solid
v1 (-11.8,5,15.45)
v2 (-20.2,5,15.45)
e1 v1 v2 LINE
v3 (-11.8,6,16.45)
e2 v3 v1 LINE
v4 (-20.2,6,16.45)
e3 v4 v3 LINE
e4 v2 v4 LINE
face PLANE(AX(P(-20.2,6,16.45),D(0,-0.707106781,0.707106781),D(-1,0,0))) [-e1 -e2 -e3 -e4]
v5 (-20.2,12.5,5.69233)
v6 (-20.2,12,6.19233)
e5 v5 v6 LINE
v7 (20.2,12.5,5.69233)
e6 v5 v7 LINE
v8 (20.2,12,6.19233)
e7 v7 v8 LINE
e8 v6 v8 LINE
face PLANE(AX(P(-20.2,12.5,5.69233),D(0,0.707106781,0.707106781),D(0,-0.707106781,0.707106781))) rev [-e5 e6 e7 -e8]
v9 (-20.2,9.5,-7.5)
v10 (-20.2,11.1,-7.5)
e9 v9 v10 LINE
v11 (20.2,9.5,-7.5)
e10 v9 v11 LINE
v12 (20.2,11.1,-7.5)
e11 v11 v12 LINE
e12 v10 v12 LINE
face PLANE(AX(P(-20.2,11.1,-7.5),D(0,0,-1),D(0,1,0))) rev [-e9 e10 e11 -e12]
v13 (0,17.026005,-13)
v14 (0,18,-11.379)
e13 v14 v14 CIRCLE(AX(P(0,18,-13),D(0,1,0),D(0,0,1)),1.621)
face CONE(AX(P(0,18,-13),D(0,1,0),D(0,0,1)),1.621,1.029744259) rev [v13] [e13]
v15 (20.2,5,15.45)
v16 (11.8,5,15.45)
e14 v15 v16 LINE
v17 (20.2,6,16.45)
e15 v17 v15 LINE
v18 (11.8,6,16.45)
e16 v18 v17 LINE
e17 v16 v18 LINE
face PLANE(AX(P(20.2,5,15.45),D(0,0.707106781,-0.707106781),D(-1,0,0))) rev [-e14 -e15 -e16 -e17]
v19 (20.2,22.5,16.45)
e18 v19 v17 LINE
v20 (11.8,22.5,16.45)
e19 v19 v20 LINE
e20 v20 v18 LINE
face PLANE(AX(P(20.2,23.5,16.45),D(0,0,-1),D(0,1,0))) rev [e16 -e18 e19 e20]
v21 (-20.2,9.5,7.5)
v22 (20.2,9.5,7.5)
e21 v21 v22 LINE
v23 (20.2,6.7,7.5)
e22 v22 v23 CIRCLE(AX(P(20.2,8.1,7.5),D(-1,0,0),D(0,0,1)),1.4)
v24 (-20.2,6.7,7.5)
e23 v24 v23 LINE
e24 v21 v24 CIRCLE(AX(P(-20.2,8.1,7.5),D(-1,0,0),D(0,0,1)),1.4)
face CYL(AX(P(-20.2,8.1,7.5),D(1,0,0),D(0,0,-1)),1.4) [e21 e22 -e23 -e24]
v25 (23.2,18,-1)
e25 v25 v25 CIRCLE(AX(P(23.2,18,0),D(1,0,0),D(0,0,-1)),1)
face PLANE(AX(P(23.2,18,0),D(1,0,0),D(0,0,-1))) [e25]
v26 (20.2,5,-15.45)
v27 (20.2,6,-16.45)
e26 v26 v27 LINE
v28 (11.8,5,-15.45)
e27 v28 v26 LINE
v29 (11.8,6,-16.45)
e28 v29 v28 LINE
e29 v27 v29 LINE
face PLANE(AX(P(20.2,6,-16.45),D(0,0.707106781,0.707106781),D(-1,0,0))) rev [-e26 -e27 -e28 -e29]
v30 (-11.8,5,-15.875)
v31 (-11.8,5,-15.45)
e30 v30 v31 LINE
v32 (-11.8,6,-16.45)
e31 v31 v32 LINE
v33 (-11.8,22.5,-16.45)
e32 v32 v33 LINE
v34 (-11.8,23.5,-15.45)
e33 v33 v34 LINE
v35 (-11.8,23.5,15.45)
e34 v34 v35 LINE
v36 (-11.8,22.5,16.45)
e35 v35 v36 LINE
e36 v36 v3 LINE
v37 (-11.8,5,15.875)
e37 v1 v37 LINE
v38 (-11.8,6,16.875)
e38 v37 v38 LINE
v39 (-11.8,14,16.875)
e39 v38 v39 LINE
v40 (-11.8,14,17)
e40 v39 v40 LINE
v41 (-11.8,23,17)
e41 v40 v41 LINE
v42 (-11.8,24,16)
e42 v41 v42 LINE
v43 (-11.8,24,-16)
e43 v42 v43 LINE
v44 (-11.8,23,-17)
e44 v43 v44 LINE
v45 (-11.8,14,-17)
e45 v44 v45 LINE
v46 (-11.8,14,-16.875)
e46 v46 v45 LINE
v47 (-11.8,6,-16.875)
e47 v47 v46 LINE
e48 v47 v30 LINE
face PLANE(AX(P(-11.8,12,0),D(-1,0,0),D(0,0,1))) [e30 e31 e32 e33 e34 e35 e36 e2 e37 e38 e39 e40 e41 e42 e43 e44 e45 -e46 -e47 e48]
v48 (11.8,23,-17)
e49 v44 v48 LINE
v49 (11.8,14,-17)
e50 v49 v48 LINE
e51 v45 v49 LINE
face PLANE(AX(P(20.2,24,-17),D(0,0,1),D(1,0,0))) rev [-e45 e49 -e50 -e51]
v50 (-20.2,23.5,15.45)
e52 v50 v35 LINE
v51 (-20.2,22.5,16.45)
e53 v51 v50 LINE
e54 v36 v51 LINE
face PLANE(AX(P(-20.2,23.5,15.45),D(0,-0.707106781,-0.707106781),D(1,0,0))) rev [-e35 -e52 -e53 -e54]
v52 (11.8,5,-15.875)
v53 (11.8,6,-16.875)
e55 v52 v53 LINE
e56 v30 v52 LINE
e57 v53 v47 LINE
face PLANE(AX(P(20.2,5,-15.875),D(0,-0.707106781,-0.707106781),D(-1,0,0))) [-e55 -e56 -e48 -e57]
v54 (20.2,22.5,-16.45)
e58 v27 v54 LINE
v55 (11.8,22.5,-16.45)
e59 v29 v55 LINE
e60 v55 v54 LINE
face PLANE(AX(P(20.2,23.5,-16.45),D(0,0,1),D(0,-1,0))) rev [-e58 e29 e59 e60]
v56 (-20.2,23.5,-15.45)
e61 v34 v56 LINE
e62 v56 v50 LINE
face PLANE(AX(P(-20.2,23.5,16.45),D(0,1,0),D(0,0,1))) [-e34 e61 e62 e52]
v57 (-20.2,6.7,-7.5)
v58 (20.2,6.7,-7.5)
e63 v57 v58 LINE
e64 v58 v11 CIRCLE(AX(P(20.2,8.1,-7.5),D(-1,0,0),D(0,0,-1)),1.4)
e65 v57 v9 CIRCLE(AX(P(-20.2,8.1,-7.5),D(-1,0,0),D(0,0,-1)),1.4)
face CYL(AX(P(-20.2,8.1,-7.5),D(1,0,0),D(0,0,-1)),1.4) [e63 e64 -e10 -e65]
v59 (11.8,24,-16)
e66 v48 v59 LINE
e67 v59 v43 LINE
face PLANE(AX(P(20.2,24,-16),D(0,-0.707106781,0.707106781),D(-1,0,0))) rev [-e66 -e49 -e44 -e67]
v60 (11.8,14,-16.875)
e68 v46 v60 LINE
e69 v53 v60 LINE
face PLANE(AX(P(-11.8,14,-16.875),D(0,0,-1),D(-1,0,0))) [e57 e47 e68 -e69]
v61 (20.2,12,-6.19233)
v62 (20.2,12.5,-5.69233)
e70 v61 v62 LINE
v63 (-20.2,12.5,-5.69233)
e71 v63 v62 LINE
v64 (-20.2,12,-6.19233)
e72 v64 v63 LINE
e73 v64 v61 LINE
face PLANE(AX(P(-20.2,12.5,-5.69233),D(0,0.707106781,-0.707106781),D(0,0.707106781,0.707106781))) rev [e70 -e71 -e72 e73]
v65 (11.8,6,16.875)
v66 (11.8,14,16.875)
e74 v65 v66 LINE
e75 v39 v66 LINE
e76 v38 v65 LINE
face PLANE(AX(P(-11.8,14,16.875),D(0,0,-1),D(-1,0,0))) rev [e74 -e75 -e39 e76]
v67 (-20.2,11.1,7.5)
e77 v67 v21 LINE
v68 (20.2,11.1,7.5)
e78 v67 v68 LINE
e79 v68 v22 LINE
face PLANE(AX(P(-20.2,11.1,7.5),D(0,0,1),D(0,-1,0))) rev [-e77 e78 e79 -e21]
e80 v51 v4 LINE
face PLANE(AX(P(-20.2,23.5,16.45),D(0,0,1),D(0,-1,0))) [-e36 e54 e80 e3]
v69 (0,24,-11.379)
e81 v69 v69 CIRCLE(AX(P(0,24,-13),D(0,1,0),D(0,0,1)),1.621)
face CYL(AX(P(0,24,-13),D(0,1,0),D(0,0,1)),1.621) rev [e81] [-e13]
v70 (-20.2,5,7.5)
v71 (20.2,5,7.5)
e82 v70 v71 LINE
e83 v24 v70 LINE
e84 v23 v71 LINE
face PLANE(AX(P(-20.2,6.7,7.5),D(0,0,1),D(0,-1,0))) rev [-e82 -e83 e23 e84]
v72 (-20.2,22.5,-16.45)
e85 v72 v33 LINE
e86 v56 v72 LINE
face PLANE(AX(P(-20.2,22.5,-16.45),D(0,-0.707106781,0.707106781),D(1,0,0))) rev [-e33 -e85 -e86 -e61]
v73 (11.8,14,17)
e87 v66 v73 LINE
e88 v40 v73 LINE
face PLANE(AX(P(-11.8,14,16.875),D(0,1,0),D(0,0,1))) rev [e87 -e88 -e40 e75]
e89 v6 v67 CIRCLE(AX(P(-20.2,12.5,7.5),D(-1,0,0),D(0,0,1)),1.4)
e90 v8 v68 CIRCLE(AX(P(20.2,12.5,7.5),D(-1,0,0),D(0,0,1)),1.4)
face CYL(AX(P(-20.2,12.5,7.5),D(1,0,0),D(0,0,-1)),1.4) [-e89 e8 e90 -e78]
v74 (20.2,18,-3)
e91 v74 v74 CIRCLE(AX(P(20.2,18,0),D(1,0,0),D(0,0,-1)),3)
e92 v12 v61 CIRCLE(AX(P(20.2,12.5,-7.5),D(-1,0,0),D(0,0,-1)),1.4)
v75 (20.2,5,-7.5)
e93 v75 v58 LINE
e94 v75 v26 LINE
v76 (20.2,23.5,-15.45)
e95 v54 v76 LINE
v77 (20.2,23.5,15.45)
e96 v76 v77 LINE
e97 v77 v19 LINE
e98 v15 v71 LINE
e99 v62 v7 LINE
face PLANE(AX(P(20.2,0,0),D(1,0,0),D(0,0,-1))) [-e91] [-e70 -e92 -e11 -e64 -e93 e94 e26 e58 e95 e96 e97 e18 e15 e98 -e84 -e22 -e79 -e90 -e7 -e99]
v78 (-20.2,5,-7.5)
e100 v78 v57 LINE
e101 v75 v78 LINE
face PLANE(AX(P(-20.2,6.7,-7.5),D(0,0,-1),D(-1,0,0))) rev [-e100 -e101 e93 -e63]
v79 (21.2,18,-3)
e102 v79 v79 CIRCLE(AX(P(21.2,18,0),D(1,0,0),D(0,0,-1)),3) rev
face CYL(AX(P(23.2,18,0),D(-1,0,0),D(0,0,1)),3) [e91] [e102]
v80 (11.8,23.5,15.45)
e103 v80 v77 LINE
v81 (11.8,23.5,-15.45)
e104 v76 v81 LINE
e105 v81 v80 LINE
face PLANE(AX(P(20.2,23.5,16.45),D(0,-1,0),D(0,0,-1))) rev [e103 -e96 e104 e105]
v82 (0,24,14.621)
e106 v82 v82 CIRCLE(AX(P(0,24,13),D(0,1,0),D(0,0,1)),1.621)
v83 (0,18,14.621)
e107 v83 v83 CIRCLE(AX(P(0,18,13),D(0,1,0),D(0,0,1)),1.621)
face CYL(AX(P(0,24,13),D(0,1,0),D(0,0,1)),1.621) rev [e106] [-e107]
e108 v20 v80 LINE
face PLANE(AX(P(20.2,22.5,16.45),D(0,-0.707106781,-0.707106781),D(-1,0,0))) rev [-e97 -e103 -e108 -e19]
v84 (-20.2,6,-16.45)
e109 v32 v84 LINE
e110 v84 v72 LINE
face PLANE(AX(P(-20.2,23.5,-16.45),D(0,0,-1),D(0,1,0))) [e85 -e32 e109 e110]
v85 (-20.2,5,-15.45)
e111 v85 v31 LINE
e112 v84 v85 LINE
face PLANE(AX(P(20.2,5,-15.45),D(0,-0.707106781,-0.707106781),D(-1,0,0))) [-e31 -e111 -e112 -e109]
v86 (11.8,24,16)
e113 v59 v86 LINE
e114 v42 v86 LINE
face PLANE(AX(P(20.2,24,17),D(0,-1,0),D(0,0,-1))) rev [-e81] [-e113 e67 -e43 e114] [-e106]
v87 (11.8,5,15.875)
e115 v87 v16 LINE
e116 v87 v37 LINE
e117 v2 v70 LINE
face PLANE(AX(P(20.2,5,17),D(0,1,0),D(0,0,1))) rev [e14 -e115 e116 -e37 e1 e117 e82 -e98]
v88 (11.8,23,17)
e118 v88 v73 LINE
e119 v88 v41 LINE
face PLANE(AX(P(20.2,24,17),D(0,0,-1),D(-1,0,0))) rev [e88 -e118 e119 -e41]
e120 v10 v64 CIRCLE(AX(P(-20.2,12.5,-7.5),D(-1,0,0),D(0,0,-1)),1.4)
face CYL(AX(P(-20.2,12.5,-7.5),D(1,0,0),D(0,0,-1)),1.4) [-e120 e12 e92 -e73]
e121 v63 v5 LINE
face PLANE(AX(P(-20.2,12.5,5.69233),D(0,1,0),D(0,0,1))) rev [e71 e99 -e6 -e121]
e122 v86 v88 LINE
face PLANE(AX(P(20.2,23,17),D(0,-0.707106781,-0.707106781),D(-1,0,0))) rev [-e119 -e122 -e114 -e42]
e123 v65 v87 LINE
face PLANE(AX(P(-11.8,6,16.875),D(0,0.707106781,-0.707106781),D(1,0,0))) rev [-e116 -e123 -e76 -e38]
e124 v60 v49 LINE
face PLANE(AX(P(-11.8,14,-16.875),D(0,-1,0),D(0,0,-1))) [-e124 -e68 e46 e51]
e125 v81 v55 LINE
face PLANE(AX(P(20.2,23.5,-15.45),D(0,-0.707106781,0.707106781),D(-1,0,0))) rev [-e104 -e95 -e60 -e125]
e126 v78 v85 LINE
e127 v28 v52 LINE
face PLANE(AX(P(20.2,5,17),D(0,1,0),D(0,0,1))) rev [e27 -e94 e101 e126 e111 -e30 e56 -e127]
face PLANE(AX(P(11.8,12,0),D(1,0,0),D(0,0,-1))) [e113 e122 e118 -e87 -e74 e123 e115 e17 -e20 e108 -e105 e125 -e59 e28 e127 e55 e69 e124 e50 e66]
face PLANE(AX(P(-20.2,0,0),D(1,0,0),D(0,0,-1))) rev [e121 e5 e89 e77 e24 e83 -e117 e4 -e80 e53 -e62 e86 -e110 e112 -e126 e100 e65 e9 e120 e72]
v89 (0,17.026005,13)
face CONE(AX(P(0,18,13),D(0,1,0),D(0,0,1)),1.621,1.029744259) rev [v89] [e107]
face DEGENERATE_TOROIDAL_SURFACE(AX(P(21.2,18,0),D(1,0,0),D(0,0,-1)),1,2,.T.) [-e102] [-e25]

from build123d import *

# Parameters (mm, degrees)
SKETCH1_W               = 34
SKETCH1_H               = 19
BOSS_EXTRUDE1_DEPTH     = 20.2
SKETCH2_OUTSIDE_W       = 47.224
SKETCH2_OUTSIDE_H       = 32.224
SKETCH2_OUTSIDE_W_2     = 32.9
SKETCH2_OUTSIDE_H_2     = 18.5
CUT_EXTRUDE2_DEPTH      = 44.462627624
CUT_EXTRUDE8_DEPTH      = 36.679686097
CUT_EXTRUDE8_DEPTH_BACK = 36.679686097
SKETCH3_W               = 0.125
SKETCH3_H               = 9
CUT_EXTRUDE3_DEPTH      = 23.6
CHAMFER1_SIZE           = 1
CHAMFER2_SIZE           = 1
CHAMFER3_SIZE           = 1
CHAMFER4_SIZE           = 1
SKETCH10_R              = 3
BOSS_EXTRUDE3_DEPTH     = 3
FILLET1_R               = 2
TAP1_D                  = 3.242
TAP1_DEPTH              = 6
TAP1_TIP                = 0.973995063


with BuildPart() as part:
    # Sketch1 → Boss-Extrude1 (new, symmetric)
    with BuildSketch(Plane(origin=(0, 0, 0), x_dir=(0, 0, -1), z_dir=(1, 0, 0))):
        with Locations((0, 14.5)):
            Rectangle(SKETCH1_W, SKETCH1_H)
    extrude(amount=BOSS_EXTRUDE1_DEPTH, both=True)

    # Sketch2 outside → Cut-Extrude2 (cut, through all)
    with BuildSketch(Plane(origin=(11.8, 0, 0), x_dir=(0, 0, -1), z_dir=(1, 0, 0))):
        with Locations((0, 14.5)):
            Rectangle(SKETCH2_OUTSIDE_W, SKETCH2_OUTSIDE_H)
        with Locations((0, 14.25)):
            Rectangle(SKETCH2_OUTSIDE_W_2, SKETCH2_OUTSIDE_H_2, mode=Mode.SUBTRACT)
    cut_extrude2 = extrude(amount=CUT_EXTRUDE2_DEPTH, mode=Mode.SUBTRACT)

    # Mirror1: Cut-Extrude2 across plane
    add(cut_extrude2.mirror(Plane(origin=(0, 0, 0), x_dir=(0, 0, 1), z_dir=(1, 0, 0))), mode=Mode.SUBTRACT)

    # Sketch5 → Cut-Extrude8 (cut, two sides: drawn at the far end of the back side and taken through both)
    with BuildSketch(Plane(origin=(0, 0, 0), x_dir=(0, 0, -1), z_dir=(1, 0, 0)).offset(-CUT_EXTRUDE8_DEPTH_BACK)):
        with BuildLine():
            Line((-5.692330317, 12.5), (5.692330317, 12.5))
            Line((5.692330317, 12.5), (6.192330317, 12))
            ThreePointArc((6.192330317, 12), (6.706274607, 11.346743741), (7.5, 11.1))
            Line((7.5, 11.1), (7.5, 9.5))
            ThreePointArc((7.5, 9.5), (6.1, 8.1), (7.5, 6.7))
            Line((7.5, 6.7), (7.5, 1))
            Line((7.5, 1), (6.5, 0))
            Line((6.5, 0), (-6.5, 0))
            Line((-6.5, 0), (-7.5, 1))
            Line((-7.5, 1), (-7.5, 6.7))
            ThreePointArc((-7.5, 6.7), (-6.1, 8.1), (-7.5, 9.5))
            Line((-7.5, 9.5), (-7.5, 11.1))
            ThreePointArc((-7.5, 11.1), (-6.706274607, 11.346743741), (-6.192330317, 12))
            Line((-6.192330317, 12), (-5.692330317, 12.5))
        make_face()
    extrude(amount=CUT_EXTRUDE8_DEPTH + CUT_EXTRUDE8_DEPTH_BACK, mode=Mode.SUBTRACT)

    # Sketch3 → Cut-Extrude3 (cut)
    with BuildSketch(Plane(origin=(11.8, 0, 0), x_dir=(0, 0, -1), z_dir=(1, 0, 0))):
        with Locations((-16.9375, 9.5)):
            Rectangle(SKETCH3_W, SKETCH3_H)
    cut_extrude3 = extrude(amount=-CUT_EXTRUDE3_DEPTH, mode=Mode.SUBTRACT)

    # Mirror2: Cut-Extrude3 across plane
    add(cut_extrude3.mirror(Plane.XY), mode=Mode.SUBTRACT)

    # Chamfer1
    chamfer1_edges = [part.edges().sort_by_distance(p)[0] for p in [
        (16, 23.5, -16.45),
        (16, 23.5, 16.45),
        (-16, 23.5, 16.45),
        (-16, 23.5, -16.45),
    ]]
    chamfer(chamfer1_edges, length=CHAMFER1_SIZE)

    # Chamfer2
    chamfer2_edges = [part.edges().sort_by_distance(p)[0] for p in [
        (0, 24, 17),
        (0, 24, -17),
    ]]
    chamfer(chamfer2_edges, length=CHAMFER2_SIZE)

    # Chamfer3
    chamfer3_edges = [part.edges().sort_by_distance(p)[0] for p in [
        (16, 5, 16.45),
        (16, 5, -16.45),
        (-16, 5, -16.45),
        (-16, 5, 16.45),
    ]]
    chamfer(chamfer3_edges, length=CHAMFER3_SIZE)

    # Chamfer4
    chamfer4_edges = [part.edges().sort_by_distance(p)[0] for p in [
        (0, 5, 16.875),
        (0, 5, -16.875),
    ]]
    chamfer(chamfer4_edges, length=CHAMFER4_SIZE)

    # Sketch10 → Boss-Extrude3 (add)
    with BuildSketch(Plane(origin=(20.2, 0, 0), x_dir=(0, 0, -1), z_dir=(1, 0, 0))):
        with Locations((0, 18)):
            Circle(SKETCH10_R)
    extrude(amount=BOSS_EXTRUDE3_DEPTH)

    # Fillet1
    fillet1_edges = [part.edges().sort_by_distance(p)[0] for p in [
        (23.2, 18, 3),
    ]]
    fillet(fillet1_edges, radius=FILLET1_R)

    # Tap1
    with Locations(Plane(origin=(0, 24, 0), x_dir=(1, 0, 0), z_dir=(0, 1, 0))):
        with Locations((0, -13), (0, 13)):
            Hole(TAP1_D / 2, depth=TAP1_DEPTH)
            with Locations((0, 0, -(TAP1_DEPTH + TAP1_TIP / 2))):  # 118° drill point
                Cone(0, TAP1_D / 2, TAP1_TIP, mode=Mode.SUBTRACT)


solid = part.part
